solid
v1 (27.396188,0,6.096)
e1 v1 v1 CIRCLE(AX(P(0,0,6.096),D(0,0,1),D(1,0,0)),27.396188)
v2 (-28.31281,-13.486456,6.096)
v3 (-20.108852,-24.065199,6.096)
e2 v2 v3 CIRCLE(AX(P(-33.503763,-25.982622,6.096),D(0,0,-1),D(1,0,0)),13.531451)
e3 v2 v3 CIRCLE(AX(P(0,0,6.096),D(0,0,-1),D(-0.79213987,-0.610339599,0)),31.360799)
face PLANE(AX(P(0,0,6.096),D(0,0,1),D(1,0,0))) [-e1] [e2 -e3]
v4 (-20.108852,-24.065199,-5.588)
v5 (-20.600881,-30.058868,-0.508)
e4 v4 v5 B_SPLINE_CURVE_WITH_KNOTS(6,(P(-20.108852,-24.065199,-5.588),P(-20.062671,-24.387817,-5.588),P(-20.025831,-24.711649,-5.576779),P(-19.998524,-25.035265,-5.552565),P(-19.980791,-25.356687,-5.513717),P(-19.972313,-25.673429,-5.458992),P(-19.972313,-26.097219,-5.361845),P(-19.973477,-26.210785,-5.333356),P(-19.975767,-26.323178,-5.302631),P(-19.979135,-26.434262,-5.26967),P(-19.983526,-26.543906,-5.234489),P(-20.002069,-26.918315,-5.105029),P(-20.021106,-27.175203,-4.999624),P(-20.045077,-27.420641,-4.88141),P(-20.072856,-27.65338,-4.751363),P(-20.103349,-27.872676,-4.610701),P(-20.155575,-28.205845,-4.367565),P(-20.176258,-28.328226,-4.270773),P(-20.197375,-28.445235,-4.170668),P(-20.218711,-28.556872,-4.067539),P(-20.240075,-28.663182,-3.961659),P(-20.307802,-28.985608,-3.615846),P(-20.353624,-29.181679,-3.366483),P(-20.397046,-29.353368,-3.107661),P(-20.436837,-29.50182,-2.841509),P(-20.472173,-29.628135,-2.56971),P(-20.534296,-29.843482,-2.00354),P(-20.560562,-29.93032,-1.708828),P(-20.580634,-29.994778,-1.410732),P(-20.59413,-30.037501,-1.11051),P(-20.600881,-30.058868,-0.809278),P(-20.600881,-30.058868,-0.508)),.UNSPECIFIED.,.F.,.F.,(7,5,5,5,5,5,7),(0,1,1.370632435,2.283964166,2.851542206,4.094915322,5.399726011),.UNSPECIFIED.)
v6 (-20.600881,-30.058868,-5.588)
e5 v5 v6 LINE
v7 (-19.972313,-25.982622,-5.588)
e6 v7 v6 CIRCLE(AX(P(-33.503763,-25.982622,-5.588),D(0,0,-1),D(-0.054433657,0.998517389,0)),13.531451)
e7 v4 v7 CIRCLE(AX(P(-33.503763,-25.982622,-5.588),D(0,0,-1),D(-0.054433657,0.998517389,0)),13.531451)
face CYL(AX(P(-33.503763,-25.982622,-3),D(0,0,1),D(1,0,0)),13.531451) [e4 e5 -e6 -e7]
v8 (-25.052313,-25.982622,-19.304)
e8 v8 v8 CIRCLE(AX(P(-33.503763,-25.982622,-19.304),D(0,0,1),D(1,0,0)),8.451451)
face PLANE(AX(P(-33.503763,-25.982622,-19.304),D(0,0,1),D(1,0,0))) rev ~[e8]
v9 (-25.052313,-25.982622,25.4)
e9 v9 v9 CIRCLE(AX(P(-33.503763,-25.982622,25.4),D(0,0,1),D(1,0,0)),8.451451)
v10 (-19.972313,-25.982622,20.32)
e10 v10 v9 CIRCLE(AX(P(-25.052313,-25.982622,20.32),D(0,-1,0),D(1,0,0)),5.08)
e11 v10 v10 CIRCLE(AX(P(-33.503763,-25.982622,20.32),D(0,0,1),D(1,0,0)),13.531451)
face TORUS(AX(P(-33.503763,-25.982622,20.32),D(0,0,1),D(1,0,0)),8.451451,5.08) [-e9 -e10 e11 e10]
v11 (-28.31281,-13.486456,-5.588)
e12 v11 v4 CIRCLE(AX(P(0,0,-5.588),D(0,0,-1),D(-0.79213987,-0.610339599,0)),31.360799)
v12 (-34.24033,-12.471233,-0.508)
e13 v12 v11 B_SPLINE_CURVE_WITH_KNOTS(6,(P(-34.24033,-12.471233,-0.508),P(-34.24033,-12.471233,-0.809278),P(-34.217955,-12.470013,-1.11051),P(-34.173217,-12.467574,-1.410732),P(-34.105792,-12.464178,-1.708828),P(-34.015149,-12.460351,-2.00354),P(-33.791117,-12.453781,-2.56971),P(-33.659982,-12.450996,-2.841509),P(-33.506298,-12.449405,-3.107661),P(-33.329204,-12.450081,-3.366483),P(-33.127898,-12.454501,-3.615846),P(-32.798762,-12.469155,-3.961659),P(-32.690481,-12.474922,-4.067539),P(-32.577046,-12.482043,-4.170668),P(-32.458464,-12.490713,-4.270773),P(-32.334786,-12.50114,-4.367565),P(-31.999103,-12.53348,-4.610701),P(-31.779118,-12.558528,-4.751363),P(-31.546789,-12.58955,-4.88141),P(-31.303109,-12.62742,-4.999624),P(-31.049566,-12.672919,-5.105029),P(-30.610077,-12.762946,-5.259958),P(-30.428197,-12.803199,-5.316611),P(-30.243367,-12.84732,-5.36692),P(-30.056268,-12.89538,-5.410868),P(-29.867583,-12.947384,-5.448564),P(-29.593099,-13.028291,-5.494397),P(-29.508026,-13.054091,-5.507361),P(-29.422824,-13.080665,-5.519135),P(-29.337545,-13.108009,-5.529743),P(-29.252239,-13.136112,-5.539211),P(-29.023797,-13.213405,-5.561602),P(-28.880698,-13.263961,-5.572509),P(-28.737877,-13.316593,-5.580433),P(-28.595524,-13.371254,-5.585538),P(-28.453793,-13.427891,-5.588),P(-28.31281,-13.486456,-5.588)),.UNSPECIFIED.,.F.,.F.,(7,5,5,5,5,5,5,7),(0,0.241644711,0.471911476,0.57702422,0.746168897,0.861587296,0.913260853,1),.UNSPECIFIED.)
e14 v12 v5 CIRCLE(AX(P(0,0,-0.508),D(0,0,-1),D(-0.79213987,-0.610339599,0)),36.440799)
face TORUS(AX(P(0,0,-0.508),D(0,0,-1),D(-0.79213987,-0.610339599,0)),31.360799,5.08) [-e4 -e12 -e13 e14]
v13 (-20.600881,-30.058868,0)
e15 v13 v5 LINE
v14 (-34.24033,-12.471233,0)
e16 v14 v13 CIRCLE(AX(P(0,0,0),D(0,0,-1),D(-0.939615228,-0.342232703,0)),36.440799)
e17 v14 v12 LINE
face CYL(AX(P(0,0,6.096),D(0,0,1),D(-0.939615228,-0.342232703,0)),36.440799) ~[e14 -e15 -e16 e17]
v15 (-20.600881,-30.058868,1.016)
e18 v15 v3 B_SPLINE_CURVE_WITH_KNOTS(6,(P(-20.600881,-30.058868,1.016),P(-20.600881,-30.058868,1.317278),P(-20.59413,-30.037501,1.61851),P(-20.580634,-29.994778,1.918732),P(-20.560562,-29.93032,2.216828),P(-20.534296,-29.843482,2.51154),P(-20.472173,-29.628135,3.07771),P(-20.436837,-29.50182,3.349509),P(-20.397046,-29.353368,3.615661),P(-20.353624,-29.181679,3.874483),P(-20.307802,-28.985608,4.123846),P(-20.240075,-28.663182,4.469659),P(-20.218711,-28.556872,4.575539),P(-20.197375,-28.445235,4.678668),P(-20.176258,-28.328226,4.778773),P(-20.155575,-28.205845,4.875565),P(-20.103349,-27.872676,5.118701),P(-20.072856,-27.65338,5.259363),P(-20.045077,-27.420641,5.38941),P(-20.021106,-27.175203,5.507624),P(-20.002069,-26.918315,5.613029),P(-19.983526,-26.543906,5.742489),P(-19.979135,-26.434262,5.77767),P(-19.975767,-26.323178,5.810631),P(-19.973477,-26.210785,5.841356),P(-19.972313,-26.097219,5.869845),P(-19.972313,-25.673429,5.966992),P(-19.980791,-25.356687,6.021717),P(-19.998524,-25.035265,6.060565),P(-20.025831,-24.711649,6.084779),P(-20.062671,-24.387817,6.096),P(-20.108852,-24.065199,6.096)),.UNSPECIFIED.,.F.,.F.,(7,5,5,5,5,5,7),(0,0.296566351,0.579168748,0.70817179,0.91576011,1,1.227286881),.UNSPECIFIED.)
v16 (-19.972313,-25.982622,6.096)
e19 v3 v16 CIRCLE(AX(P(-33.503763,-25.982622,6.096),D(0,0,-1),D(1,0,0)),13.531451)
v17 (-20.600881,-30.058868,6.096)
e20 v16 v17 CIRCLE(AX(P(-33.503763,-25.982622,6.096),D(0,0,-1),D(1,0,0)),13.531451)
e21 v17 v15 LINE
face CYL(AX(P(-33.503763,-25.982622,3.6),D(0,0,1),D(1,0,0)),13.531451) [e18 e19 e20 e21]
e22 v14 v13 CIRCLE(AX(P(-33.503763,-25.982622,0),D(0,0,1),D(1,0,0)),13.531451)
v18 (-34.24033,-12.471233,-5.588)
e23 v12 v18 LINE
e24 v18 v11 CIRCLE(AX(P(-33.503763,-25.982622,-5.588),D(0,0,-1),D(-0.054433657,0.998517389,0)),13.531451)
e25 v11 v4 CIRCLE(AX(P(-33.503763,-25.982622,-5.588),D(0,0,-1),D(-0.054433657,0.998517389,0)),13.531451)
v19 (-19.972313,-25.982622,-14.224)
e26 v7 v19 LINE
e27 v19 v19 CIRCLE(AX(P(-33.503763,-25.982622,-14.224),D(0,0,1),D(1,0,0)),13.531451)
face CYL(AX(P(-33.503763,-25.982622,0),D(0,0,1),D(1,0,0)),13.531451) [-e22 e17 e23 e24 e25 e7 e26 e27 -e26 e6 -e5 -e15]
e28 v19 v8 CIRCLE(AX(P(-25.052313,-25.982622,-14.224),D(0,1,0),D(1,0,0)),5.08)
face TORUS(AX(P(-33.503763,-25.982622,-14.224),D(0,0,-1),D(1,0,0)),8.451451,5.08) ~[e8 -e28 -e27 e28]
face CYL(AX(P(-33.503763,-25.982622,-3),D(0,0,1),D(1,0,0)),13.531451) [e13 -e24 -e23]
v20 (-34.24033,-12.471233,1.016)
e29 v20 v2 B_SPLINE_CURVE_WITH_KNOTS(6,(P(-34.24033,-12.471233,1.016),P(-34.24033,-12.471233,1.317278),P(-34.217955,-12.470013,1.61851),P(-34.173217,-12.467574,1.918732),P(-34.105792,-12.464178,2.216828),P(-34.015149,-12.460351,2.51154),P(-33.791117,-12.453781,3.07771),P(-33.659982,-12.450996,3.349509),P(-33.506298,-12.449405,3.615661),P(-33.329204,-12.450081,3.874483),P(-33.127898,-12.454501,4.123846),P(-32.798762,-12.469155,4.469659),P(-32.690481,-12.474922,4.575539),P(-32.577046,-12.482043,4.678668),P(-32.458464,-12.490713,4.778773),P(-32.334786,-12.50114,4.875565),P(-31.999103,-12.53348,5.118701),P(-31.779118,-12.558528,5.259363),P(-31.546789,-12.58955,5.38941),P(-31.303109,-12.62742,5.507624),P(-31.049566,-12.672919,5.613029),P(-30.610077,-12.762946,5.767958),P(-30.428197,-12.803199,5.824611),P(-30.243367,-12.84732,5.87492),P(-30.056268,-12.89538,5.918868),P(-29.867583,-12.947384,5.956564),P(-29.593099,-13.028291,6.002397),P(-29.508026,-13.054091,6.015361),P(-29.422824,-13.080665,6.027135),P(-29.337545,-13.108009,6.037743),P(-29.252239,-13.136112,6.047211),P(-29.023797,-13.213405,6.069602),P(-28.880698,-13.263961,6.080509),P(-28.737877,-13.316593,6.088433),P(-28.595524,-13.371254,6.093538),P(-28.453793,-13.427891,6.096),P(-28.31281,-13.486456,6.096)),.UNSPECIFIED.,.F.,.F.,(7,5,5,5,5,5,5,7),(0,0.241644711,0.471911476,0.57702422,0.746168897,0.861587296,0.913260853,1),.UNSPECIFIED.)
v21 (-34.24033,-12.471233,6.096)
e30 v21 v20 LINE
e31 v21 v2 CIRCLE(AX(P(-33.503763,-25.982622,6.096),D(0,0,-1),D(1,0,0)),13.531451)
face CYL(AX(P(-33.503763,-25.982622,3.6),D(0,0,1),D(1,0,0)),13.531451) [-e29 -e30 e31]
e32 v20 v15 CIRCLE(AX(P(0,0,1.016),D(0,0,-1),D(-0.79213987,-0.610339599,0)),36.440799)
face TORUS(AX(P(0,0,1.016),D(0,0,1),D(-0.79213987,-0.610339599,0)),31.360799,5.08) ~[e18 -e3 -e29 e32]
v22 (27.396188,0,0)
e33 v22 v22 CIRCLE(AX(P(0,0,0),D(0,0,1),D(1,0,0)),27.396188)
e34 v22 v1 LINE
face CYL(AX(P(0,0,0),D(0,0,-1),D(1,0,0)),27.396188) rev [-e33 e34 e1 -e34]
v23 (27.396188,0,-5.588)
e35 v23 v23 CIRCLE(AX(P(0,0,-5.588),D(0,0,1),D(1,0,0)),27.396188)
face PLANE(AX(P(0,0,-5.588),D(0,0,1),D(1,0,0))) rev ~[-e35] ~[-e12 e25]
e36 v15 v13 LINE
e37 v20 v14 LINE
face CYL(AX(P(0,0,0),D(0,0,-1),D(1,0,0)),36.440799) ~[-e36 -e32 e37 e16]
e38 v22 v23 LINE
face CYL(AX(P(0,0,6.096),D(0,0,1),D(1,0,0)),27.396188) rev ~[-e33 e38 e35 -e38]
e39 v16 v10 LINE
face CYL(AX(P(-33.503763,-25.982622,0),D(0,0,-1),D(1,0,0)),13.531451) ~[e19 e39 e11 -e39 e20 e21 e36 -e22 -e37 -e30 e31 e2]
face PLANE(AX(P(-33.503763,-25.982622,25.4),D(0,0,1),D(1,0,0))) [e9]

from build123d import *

# Parameters (mm, degrees)
F0_R          = 36.4407990547
F0_R_2        = 27.3961880776
F1_DEPTH      = 6.096
F2_R          = 13.5314507832
F3_DEPTH      = 25.4
F3_DEPTH_BACK = 19.304
F4_R          = 5.08
F5_DEPTH      = 11.684
F6_T4_ANGLE   = 359.64
F6_S5_R       = 13.5314507832
F6_T6_DEPTH   = 57
F6_T10_ANGLE  = 359.64
F6_S11_R      = 13.5314507832
F6_T12_DEPTH  = 57


# Not quite as in the source:
# - a fillet or chamfer that OpenCascade refuses, or shapes differently, is made with other operations: its cross-section is extruded or revolved along the edge and cut away or added


with BuildPart() as f1:
    # F0 (on Top) → F1 (new body)
    with BuildSketch(Plane.XY):
        Circle(F0_R)
        Circle(F0_R_2, mode=Mode.SUBTRACT)
    extrude(amount=F1_DEPTH)

    # F2 (on Top) → F3 (join, two sides)
    with BuildSketch(Plane.XY) as f3_sk:
        with Locations((-33.5037633777, -25.9826220572)):
            Circle(F2_R)
    extrude(amount=F3_DEPTH)
    extrude(f3_sk.sketch, amount=-F3_DEPTH_BACK)

    # F4
    f4_edges = [f1.edges().sort_by_distance(p)[0] for p in [
        (-47.035214, -25.982622, 25.4),
        (-47.035214, -25.982622, -19.304),
    ]]
    fillet(f4_edges, radius=F4_R)

    # F5 (add): a face of the model
    f5_faces = [f1.faces().sort_by_distance(p)[0] for p in [
        (-19.1117163602, -28.201914774, 6.096),
    ]]
    extrude(f5_faces, amount=-F5_DEPTH)

    # F6: fillet of radius 5.08 on 2 edges, made by hand


with BuildPart() as f6_tool2:
    # F6_s3 → F6_t4 (revolve)
    with BuildSketch(Plane(origin=(0, 0, 0), x_dir=(0, 0, 1), z_dir=(0.6103395994, -0.7921398699, 0))):
        with BuildLine():
            ThreePointArc((-0.508, 36.4407990547), (-4.1001024484, 34.9529015031), (-5.588, 31.3607990547))
            Line((-5.588, 31.3607990547), (-5.588, 36.4407990547))
            Line((-5.588, 36.4407990547), (-0.508, 36.4407990547))
        make_face()
    revolve(axis=Axis((0, 0, -5.588), (0, 0, -1)), revolution_arc=F6_T4_ANGLE)

    # F6_s5 → F6_t6 (cut, symmetric)
    with BuildSketch(Plane.XY.offset(-3)):
        with Locations((-33.5037633777, -25.9826220572)):
            Circle(F6_S5_R)
    extrude(amount=F6_T6_DEPTH, both=True, mode=Mode.SUBTRACT)


with BuildPart() as f1_1:
    add(f1.part)

    # F6_t1: cut F6_tool2
    add(f6_tool2.part, mode=Mode.SUBTRACT)


with BuildPart() as f6_tool8:
    # F6_s9 → F6_t10 (revolve)
    with BuildSketch(Plane(origin=(0, 0, 0), x_dir=(0, 0, 1), z_dir=(0.6103395994, -0.7921398699, 0))):
        with BuildLine():
            ThreePointArc((1.016, 36.4407990547), (4.6081024484, 34.9529015031), (6.096, 31.3607990547))
            Line((6.096, 31.3607990547), (6.096, 36.4407990547))
            Line((6.096, 36.4407990547), (1.016, 36.4407990547))
        make_face()
    revolve(axis=Axis((0, 0, 6.096), (0, 0, -1)), revolution_arc=F6_T10_ANGLE)

    # F6_s11 → F6_t12 (cut, symmetric)
    with BuildSketch(Plane.XY.offset(3.6)):
        with Locations((-33.5037633777, -25.9826220572)):
            Circle(F6_S11_R)
    extrude(amount=F6_T12_DEPTH, both=True, mode=Mode.SUBTRACT)


with BuildPart() as f1_2:
    add(f1_1.part)

    # F6_t7: cut F6_tool8
    add(f6_tool8.part, mode=Mode.SUBTRACT)


solid = f1_2.part
